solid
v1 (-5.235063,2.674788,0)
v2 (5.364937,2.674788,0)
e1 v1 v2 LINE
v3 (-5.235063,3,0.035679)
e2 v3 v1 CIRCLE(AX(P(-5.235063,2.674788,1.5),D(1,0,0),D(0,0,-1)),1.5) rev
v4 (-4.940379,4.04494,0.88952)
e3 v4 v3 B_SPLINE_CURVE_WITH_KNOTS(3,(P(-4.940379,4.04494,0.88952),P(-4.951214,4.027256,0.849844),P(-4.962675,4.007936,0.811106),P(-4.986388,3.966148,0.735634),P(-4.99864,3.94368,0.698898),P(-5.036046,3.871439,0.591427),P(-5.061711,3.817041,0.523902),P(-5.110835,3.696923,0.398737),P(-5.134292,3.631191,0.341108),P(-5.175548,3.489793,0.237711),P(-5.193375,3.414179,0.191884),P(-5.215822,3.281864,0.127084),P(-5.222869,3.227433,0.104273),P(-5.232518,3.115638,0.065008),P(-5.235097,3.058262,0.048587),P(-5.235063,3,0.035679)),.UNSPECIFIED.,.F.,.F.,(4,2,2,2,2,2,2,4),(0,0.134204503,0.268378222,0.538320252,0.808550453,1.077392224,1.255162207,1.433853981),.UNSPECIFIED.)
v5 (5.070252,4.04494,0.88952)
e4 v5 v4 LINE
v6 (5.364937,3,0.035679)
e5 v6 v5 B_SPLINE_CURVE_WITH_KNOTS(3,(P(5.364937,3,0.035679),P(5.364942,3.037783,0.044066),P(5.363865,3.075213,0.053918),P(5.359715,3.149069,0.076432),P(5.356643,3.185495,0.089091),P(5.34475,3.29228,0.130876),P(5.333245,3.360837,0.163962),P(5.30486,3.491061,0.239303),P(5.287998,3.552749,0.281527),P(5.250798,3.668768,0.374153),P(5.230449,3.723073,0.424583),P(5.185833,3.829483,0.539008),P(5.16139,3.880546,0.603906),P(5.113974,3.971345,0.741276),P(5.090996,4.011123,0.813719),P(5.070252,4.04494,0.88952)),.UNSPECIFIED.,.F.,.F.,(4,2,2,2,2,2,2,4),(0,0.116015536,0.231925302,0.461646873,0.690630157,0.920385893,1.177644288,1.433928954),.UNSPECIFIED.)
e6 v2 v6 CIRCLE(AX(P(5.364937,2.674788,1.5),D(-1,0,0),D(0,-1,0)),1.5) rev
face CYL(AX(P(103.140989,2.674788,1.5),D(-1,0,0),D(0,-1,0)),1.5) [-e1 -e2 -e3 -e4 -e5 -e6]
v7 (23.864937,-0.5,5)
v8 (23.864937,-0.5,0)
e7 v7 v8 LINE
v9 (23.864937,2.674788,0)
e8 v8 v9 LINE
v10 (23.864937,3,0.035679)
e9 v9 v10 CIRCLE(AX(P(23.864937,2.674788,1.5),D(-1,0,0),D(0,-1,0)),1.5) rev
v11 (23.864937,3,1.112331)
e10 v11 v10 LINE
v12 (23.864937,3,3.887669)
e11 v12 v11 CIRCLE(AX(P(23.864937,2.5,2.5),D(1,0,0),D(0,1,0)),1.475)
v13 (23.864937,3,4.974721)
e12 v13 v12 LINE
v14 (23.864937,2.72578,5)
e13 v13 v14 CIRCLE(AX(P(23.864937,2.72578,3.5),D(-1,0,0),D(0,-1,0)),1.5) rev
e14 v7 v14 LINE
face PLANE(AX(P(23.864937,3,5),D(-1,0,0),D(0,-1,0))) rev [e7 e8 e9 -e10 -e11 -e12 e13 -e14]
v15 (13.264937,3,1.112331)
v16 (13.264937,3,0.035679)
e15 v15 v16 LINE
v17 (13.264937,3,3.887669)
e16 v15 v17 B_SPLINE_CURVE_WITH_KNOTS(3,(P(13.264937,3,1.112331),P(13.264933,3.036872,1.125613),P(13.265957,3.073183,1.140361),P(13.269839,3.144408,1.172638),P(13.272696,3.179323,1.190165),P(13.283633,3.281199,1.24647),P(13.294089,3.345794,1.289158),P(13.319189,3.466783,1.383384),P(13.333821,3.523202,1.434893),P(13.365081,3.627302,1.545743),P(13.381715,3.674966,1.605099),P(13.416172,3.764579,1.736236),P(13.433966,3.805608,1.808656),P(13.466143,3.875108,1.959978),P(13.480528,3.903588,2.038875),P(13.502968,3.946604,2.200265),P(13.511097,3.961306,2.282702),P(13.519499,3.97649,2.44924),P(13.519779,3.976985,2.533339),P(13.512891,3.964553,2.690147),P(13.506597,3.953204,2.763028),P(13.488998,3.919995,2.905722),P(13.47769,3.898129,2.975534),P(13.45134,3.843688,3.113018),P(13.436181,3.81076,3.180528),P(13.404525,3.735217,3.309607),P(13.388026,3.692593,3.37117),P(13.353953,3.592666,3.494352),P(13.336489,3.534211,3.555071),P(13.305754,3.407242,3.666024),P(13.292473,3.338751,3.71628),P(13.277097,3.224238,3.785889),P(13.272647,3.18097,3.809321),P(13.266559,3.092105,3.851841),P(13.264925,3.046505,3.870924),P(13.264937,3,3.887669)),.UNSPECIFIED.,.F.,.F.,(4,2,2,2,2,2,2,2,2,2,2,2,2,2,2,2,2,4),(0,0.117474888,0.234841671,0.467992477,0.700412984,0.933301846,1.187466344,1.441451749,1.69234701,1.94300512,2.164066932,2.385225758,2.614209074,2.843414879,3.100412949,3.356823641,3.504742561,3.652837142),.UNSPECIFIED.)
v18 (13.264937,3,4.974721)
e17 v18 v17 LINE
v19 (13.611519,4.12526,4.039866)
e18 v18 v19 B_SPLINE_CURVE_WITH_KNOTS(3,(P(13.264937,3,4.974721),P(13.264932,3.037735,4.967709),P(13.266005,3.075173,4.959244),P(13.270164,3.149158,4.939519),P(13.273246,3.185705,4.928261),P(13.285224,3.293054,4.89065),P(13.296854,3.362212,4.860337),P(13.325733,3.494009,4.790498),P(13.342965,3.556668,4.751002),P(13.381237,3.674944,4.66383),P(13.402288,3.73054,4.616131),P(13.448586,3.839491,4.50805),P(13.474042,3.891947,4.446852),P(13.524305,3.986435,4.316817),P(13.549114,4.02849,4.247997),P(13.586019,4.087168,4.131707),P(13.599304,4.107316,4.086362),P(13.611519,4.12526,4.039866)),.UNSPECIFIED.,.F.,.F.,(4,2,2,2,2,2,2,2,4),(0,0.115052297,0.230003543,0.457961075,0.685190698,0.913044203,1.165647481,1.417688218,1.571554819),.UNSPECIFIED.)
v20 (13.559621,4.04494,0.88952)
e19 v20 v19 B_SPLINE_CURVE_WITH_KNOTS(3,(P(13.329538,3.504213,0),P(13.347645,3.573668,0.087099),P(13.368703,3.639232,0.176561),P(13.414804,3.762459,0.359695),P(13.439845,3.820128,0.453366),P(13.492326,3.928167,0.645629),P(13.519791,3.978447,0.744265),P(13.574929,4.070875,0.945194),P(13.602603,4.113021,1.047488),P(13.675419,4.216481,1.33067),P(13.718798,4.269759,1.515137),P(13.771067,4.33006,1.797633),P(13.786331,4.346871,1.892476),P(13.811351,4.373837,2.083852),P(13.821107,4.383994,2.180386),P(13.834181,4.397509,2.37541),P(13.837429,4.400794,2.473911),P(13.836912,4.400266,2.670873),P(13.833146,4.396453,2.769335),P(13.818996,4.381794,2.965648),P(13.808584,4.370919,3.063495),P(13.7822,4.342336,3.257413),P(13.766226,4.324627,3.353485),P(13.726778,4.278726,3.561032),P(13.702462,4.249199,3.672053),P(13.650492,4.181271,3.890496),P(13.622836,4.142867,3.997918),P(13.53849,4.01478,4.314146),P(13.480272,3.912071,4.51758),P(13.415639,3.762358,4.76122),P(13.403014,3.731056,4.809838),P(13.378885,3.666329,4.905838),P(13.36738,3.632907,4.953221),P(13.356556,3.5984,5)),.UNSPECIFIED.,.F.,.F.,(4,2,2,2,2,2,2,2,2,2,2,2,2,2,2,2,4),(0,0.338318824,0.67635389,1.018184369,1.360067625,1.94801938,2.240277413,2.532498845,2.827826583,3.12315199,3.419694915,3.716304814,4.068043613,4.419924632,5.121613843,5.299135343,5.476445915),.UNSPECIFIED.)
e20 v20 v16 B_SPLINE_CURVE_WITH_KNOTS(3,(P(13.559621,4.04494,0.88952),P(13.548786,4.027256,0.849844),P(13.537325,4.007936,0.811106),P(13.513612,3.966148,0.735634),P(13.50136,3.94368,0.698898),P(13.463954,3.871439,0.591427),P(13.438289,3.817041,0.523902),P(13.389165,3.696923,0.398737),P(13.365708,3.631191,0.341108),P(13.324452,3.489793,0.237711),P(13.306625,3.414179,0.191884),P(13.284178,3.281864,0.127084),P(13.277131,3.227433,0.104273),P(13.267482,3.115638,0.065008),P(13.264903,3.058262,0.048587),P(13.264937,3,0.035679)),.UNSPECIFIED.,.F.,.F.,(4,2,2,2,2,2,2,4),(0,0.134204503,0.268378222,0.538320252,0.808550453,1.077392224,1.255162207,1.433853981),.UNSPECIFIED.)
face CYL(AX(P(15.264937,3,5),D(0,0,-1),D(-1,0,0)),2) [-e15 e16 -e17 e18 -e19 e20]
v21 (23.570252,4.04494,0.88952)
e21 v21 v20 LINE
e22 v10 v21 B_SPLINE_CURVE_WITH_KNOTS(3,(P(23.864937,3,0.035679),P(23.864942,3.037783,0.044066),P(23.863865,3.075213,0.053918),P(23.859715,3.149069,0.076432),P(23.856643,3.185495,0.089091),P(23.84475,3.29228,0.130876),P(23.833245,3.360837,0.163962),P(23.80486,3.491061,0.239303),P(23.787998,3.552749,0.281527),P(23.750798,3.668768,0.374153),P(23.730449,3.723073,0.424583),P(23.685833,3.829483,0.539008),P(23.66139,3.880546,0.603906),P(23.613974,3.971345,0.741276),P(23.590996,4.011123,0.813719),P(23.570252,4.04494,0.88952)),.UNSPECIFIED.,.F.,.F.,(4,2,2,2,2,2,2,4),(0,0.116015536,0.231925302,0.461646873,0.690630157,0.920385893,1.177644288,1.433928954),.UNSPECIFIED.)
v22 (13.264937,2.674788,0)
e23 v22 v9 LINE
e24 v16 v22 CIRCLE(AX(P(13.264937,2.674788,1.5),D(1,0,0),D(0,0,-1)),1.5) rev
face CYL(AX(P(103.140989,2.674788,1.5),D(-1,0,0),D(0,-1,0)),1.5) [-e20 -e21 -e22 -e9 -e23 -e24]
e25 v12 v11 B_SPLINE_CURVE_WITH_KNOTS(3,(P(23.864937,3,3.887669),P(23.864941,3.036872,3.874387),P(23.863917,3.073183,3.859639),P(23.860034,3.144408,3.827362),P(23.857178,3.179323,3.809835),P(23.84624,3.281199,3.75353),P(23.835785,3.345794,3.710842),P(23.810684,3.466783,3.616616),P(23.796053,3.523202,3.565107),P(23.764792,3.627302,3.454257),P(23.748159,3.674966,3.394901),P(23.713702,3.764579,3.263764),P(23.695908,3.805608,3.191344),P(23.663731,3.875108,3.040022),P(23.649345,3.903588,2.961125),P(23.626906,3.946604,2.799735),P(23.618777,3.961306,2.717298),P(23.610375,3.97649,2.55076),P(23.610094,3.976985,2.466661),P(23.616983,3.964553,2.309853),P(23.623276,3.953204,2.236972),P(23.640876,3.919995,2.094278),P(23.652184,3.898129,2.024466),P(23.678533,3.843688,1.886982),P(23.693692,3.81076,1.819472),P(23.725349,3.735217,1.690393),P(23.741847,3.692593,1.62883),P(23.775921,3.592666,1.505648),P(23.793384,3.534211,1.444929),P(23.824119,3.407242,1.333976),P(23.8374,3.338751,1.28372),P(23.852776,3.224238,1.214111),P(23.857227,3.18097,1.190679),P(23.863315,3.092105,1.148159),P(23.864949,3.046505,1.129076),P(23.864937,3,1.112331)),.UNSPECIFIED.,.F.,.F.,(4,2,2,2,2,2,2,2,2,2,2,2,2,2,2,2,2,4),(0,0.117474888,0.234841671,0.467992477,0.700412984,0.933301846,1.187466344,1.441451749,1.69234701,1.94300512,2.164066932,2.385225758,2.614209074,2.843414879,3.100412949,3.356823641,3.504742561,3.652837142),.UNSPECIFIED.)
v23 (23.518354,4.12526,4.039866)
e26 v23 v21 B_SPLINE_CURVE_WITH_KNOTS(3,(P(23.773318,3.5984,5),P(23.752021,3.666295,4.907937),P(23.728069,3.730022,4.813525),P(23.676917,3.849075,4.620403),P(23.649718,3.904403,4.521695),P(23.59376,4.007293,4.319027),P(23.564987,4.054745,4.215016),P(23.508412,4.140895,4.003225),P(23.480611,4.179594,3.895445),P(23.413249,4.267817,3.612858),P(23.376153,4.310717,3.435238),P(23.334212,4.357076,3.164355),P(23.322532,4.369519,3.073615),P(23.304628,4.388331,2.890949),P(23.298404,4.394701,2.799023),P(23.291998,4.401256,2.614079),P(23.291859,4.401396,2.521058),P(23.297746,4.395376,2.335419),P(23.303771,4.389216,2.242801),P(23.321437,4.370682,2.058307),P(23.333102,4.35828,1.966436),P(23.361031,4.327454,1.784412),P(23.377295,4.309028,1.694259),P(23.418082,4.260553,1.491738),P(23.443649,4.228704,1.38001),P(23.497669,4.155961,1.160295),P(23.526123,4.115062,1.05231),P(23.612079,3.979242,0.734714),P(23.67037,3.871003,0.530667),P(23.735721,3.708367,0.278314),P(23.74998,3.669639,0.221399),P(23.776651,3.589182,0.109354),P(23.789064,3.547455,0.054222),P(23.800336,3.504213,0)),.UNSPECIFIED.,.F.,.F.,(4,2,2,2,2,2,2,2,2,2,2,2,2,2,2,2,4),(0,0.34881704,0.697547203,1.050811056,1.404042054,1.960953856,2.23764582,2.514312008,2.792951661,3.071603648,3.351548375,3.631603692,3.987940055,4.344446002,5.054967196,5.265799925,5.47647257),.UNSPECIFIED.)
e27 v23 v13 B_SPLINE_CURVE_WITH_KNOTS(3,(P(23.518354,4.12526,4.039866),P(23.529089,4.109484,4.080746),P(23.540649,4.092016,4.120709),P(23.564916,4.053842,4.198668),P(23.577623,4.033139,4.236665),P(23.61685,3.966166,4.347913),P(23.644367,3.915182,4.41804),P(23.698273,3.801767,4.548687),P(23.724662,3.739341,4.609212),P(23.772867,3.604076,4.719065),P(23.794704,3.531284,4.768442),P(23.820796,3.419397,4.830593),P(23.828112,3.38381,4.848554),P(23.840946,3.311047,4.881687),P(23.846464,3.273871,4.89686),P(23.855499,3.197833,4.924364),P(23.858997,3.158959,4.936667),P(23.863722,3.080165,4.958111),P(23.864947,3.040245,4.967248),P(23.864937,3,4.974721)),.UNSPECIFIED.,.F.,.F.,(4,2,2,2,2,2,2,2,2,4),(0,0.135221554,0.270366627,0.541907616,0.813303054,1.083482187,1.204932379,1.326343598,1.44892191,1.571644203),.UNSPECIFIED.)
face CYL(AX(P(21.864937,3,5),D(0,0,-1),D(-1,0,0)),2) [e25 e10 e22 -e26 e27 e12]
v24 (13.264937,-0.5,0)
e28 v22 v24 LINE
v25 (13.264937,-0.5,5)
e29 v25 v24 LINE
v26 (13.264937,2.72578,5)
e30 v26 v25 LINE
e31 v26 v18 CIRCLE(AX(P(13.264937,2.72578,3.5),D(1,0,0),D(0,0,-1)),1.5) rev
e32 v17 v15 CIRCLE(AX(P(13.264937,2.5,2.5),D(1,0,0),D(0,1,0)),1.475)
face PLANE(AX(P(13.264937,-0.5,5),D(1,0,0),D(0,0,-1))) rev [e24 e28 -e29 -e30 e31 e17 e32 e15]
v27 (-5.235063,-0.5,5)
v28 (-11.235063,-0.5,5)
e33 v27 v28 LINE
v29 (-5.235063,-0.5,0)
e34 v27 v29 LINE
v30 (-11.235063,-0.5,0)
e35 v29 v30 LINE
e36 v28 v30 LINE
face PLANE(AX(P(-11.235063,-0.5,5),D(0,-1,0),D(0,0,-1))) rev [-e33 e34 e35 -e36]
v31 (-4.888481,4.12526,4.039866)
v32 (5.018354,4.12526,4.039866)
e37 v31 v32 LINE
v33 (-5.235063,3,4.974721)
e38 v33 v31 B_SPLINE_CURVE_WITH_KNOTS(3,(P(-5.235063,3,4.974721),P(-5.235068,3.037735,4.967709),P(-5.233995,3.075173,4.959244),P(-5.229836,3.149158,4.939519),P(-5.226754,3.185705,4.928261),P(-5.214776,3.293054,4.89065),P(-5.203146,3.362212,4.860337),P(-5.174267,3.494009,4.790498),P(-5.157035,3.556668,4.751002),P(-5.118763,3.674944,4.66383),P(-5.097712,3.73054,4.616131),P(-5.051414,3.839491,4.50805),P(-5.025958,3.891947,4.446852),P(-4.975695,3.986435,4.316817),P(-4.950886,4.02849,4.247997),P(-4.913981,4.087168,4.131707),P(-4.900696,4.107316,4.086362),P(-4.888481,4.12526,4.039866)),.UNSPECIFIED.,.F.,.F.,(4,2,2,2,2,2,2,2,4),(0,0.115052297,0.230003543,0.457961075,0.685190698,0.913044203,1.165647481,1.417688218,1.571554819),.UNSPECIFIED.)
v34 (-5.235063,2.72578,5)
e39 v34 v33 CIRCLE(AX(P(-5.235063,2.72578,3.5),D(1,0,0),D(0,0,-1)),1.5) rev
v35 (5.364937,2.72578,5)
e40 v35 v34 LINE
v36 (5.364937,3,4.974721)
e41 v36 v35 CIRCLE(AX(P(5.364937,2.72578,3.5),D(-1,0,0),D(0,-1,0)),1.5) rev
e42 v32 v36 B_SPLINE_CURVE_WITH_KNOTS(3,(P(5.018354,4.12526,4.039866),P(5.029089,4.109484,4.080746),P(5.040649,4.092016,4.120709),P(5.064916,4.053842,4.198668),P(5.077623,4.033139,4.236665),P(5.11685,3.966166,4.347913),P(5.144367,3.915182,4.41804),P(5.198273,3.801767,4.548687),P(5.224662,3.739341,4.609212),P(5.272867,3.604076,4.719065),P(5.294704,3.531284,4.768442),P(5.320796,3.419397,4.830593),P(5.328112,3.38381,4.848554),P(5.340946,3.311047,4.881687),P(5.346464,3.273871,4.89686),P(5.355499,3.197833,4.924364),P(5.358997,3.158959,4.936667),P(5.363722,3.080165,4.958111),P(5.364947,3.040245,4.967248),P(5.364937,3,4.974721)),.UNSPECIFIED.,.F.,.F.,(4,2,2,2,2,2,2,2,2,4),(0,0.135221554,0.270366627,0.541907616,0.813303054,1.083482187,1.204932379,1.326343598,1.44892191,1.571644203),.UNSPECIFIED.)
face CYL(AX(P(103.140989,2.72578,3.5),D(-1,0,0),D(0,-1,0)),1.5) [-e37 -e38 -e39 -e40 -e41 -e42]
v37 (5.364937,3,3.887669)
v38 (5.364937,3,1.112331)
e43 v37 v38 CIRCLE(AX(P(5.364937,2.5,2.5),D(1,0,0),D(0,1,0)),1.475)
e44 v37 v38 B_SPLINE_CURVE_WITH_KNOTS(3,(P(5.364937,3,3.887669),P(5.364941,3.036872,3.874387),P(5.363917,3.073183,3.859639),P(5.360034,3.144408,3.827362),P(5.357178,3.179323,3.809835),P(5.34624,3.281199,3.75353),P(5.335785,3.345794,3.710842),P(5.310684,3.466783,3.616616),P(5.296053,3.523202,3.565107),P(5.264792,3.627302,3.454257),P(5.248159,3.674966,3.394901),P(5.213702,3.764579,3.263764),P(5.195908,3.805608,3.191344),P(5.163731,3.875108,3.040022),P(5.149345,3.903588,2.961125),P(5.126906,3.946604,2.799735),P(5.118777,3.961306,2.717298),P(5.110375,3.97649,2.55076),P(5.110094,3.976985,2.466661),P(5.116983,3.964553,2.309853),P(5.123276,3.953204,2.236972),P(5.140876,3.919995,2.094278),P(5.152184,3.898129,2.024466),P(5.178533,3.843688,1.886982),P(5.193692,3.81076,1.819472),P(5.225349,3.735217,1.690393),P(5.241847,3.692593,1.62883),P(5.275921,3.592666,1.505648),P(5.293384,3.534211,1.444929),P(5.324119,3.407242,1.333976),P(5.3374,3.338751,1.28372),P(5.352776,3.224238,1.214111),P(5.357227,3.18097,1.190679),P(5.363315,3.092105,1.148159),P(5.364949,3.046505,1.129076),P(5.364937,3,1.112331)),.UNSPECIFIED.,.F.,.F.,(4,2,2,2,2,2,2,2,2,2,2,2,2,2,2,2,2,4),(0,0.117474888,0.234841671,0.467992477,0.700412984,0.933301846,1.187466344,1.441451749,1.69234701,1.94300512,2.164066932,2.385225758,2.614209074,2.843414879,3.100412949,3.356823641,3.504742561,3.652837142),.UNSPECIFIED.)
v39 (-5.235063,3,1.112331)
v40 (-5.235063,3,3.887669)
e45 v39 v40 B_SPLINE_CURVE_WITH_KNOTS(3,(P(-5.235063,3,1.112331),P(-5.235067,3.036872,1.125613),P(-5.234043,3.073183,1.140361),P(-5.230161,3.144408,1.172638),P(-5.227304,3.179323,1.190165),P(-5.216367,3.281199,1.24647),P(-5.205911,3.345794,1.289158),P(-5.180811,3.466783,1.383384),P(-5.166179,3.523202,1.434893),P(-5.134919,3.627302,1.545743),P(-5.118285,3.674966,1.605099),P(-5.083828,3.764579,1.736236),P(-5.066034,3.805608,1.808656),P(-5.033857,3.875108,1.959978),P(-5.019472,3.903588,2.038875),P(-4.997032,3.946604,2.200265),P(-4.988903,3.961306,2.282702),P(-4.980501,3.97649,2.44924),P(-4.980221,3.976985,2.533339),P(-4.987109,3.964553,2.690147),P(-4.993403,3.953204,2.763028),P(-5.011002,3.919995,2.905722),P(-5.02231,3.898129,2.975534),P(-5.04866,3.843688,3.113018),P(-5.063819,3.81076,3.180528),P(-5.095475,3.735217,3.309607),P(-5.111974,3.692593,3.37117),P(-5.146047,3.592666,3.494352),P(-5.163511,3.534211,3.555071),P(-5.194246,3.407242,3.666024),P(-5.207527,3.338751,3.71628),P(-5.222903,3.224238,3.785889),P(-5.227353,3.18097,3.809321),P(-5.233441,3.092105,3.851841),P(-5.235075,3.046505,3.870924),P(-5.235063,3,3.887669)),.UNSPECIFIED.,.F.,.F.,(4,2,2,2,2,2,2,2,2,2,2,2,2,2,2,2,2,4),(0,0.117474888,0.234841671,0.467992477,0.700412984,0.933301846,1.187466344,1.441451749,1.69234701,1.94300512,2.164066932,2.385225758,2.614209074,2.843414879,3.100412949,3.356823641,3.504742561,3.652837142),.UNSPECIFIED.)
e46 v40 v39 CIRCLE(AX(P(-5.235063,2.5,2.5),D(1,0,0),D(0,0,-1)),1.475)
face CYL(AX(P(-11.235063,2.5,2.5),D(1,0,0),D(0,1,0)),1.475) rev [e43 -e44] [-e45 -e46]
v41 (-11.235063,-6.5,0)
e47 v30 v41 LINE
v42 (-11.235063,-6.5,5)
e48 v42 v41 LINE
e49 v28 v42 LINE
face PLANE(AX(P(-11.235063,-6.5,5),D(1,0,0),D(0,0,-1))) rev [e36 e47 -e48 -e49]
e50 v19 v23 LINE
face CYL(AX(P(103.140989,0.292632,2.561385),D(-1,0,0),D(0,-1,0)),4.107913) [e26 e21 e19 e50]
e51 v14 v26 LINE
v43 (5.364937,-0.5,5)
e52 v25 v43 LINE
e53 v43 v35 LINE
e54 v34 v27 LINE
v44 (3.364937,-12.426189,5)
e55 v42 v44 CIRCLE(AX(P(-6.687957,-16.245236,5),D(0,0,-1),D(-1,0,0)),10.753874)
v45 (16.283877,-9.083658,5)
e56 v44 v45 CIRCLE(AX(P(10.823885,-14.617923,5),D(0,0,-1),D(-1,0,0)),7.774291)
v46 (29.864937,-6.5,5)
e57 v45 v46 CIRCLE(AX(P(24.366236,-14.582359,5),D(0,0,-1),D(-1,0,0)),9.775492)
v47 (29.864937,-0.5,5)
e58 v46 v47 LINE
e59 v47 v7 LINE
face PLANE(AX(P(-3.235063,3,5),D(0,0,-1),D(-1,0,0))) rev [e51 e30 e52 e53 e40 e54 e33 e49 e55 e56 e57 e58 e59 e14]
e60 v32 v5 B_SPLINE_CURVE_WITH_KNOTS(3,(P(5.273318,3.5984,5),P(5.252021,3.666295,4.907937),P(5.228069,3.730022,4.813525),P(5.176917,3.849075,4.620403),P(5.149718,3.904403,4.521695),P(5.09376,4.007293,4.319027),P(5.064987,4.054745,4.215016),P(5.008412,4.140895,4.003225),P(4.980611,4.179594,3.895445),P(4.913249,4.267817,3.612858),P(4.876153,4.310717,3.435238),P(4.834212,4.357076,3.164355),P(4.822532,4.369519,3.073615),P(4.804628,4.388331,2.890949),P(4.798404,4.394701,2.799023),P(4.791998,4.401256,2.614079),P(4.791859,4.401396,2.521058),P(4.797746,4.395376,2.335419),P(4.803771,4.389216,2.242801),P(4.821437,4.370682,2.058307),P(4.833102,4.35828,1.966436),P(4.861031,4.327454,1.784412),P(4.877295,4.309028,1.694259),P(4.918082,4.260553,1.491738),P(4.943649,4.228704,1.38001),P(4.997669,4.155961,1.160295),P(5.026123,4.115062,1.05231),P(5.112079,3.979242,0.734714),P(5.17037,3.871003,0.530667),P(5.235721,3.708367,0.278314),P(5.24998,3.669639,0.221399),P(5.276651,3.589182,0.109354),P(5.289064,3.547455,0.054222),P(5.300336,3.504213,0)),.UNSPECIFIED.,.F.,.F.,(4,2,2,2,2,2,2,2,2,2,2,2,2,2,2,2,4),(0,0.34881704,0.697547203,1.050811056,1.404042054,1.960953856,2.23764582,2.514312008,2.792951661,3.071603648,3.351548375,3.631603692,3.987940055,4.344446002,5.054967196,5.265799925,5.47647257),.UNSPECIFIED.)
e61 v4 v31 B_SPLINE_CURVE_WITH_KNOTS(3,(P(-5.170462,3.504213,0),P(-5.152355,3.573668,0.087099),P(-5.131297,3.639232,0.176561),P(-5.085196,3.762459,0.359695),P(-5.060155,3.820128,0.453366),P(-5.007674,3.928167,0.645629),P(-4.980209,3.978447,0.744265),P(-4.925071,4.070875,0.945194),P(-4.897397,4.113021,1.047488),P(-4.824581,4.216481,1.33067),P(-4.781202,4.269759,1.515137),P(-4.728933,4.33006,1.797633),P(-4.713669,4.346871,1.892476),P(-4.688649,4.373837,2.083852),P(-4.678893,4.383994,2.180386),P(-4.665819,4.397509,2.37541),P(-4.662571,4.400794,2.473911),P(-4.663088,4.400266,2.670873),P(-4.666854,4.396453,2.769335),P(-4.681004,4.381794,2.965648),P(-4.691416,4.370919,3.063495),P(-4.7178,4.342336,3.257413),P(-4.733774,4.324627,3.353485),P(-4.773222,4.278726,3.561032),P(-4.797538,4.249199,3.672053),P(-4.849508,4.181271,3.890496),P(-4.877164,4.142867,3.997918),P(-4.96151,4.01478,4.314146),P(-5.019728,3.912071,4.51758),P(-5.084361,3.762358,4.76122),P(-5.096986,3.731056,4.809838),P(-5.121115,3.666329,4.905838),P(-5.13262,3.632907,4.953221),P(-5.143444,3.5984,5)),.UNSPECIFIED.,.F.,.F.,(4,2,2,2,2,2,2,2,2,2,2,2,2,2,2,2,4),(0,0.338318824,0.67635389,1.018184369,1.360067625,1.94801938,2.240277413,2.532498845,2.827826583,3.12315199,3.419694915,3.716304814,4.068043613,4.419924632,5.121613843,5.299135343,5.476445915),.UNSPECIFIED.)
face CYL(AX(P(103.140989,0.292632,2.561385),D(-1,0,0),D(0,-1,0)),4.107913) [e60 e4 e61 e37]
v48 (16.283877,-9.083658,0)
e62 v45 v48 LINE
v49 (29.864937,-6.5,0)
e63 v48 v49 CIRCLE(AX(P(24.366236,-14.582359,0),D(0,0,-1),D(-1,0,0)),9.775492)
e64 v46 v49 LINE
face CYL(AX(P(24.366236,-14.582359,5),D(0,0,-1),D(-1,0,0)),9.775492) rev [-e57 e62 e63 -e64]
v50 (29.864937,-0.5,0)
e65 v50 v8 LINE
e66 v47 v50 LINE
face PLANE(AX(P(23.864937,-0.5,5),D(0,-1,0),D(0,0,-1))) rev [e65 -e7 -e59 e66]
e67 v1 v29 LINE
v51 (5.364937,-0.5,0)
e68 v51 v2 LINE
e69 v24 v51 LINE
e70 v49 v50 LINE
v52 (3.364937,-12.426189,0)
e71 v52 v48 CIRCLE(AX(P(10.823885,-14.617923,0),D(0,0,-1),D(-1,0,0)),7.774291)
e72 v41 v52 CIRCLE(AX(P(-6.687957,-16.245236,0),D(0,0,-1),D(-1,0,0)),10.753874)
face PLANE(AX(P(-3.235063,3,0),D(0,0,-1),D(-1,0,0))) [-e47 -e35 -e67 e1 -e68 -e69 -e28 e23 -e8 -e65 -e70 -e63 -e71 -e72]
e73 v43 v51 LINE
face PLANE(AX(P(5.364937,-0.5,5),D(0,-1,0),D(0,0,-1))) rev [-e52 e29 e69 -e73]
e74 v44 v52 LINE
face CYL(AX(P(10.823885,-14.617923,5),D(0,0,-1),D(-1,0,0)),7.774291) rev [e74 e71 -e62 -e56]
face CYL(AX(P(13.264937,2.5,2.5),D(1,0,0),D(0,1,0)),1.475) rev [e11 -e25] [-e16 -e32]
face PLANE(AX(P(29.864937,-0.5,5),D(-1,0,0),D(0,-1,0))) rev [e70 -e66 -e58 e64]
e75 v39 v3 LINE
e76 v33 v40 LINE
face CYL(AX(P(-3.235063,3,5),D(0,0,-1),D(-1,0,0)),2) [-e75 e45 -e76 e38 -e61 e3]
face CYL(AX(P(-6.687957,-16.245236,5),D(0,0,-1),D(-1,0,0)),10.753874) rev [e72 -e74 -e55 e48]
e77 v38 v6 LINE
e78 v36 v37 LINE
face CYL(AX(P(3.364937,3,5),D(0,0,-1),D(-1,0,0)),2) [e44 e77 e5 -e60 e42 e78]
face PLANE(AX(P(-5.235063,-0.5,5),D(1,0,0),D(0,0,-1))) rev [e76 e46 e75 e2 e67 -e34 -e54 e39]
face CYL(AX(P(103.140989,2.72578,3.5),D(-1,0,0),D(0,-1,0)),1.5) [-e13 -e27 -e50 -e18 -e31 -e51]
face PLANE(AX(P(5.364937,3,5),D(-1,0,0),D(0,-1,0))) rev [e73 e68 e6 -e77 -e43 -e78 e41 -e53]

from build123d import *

# Parameters (mm, degrees)
SALIENTE_EXTRUIR1_DEPTH    = 5
CROQUIS5_R                 = 1.475
CORTAR_EXTRUIR3_DEPTH      = 10.6
CROQUIS10_R                = 1.475
CORTAR_EXTRUIR5_DEPTH      = 28.922395492
CORTAR_EXTRUIR6_DEPTH      = 38.568872355
CORTAR_EXTRUIR6_DEPTH_BACK = 38.568872355
REDONDEO5_R                = 1.5


with BuildPart() as part:
    # Croquis1 → Saliente-Extruir1 (new body)
    with BuildSketch(Plane.XY):
        with BuildLine():
            Line((-11.235063244, -0.5), (-5.235063244, -0.5))
            Line((-5.235063244, -0.5), (-5.235063244, 3))
            ThreePointArc((-5.235063244, 3), (-4.649276807, 4.414213562), (-3.235063244, 5))
            Line((-3.235063244, 5), (3.364936756, 5))
            ThreePointArc((3.364936756, 5), (4.779150318, 4.414213562), (5.364936756, 3))
            Line((5.364936756, 3), (5.364936756, -0.5))
            Line((5.364936756, -0.5), (13.264936756, -0.5))
            Line((13.264936756, -0.5), (13.264936756, 3))
            ThreePointArc((13.264936756, 3), (13.850723193, 4.414213562), (15.264936756, 5))
            Line((15.264936756, 5), (21.864936756, 5))
            ThreePointArc((21.864936756, 5), (23.279150318, 4.414213562), (23.864936756, 3))
            Line((23.864936756, 3), (23.864936756, -0.5))
            Line((23.864936756, -0.5), (29.864936756, -0.5))
            Line((29.864936756, -0.5), (29.864936756, -6.5))
            ThreePointArc((29.864936756, -6.5), (22.539313598, -4.979099508), (16.283876735, -9.083658268))
            ThreePointArc((16.283876735, -9.083658268), (8.876557279, -7.091468541), (3.364936756, -12.426188836))
            ThreePointArc((3.364936756, -12.426188836), (-2.643411058, -6.280927524), (-11.235063244, -6.5))
            Line((-11.235063244, -6.5), (-11.235063244, -0.5))
        make_face()
    extrude(amount=SALIENTE_EXTRUIR1_DEPTH)

    # Croquis5 → Cortar-Extruir3 (cut)
    with BuildSketch(Plane(origin=(23.864936756, 0, 0), x_dir=(0, 0, -1), z_dir=(1, 0, 0))):
        with Locations(Location((-2.5, 2.5, 0), (0, 0, 160.185071851))):
            Circle(CROQUIS5_R)
    extrude(amount=-CORTAR_EXTRUIR3_DEPTH, mode=Mode.SUBTRACT)

    # Croquis10 → Cortar-Extruir5 (cut, through all)
    with BuildSketch(Plane(origin=(5.364936756, 0, 0), x_dir=(0, 0, -1), z_dir=(1, 0, 0))):
        with Locations(Location((-2.5, 2.5, 0), (0, 0, 160.185071851))):
            Circle(CROQUIS10_R)
    extrude(amount=-CORTAR_EXTRUIR5_DEPTH, mode=Mode.SUBTRACT)

    # Croquis12 → Cortar-Extruir6 (cut, two sides: drawn at the far end of the back side and taken through both)
    with BuildSketch(Plane(origin=(23.864936756, 0, 0), x_dir=(0, 0, -1), z_dir=(1, 0, 0)).offset(-CORTAR_EXTRUIR6_DEPTH_BACK)):
        with BuildLine():
            Line((-35.945468922, -27.281986612), (-5.466117705, 3.197364605))
            ThreePointArc((-5.466117705, 3.197364605), (-2.561384811, 4.400544365), (0.343348083, 3.197364605))
            Line((0.343348083, 3.197364605), (30.8226993, -27.281986612))
            Line((30.8226993, -27.281986612), (30.8226993, 58.926637114))
            Line((30.8226993, 58.926637114), (-35.945468922, 58.926637114))
            Line((-35.945468922, 58.926637114), (-35.945468922, -27.281986612))
        make_face()
    extrude(amount=CORTAR_EXTRUIR6_DEPTH + CORTAR_EXTRUIR6_DEPTH_BACK, mode=Mode.SUBTRACT)

    # Redondeo5
    # the kernel refuses this fillet: 1.5 mm, written as the material it takes off along each edge
    with BuildSketch(Plane(origin=(7.90277719, 3.504212976, 0), x_dir=(0, -1, 0), z_dir=(-1, 0, 0)), Plane(origin=(26.40277719, 3.504212976, 0), x_dir=(0, -1, 0), z_dir=(-1, 0, 0))) as redondeo5_piece_1:
        with BuildLine():
            CenterArc((0.829424534, 1.5), REDONDEO5_R, 204.015661093, 65.984338907)
            ThreePointArc((-0.540726837, 0.889520499), (-0.298653835, 0.427562908), (0, 0))
            Line((0, 0), (0.829424534, 0))
        make_face()
    extrude(amount=15.675680868, mode=Mode.SUBTRACT)
    with BuildSketch(Plane(origin=(8.011290884, 3.59839975, 5), x_dir=(0, -1, 0), z_dir=(-1, 0, 0)), Plane(origin=(26.511290884, 3.59839975, 5), x_dir=(0, -1, 0), z_dir=(-1, 0, 0))) as redondeo5_piece_2:
        with BuildLine():
            CenterArc((0.872619886, -1.5), REDONDEO5_R, 90, 68.905299391)
            ThreePointArc((-0.526860355, -0.960134226), (-0.295570649, -0.462430475), (0, 0))
            Line((0, 0), (0.872619886, 0))
        make_face()
    extrude(amount=15.892708257, mode=Mode.SUBTRACT)


solid = part.part
